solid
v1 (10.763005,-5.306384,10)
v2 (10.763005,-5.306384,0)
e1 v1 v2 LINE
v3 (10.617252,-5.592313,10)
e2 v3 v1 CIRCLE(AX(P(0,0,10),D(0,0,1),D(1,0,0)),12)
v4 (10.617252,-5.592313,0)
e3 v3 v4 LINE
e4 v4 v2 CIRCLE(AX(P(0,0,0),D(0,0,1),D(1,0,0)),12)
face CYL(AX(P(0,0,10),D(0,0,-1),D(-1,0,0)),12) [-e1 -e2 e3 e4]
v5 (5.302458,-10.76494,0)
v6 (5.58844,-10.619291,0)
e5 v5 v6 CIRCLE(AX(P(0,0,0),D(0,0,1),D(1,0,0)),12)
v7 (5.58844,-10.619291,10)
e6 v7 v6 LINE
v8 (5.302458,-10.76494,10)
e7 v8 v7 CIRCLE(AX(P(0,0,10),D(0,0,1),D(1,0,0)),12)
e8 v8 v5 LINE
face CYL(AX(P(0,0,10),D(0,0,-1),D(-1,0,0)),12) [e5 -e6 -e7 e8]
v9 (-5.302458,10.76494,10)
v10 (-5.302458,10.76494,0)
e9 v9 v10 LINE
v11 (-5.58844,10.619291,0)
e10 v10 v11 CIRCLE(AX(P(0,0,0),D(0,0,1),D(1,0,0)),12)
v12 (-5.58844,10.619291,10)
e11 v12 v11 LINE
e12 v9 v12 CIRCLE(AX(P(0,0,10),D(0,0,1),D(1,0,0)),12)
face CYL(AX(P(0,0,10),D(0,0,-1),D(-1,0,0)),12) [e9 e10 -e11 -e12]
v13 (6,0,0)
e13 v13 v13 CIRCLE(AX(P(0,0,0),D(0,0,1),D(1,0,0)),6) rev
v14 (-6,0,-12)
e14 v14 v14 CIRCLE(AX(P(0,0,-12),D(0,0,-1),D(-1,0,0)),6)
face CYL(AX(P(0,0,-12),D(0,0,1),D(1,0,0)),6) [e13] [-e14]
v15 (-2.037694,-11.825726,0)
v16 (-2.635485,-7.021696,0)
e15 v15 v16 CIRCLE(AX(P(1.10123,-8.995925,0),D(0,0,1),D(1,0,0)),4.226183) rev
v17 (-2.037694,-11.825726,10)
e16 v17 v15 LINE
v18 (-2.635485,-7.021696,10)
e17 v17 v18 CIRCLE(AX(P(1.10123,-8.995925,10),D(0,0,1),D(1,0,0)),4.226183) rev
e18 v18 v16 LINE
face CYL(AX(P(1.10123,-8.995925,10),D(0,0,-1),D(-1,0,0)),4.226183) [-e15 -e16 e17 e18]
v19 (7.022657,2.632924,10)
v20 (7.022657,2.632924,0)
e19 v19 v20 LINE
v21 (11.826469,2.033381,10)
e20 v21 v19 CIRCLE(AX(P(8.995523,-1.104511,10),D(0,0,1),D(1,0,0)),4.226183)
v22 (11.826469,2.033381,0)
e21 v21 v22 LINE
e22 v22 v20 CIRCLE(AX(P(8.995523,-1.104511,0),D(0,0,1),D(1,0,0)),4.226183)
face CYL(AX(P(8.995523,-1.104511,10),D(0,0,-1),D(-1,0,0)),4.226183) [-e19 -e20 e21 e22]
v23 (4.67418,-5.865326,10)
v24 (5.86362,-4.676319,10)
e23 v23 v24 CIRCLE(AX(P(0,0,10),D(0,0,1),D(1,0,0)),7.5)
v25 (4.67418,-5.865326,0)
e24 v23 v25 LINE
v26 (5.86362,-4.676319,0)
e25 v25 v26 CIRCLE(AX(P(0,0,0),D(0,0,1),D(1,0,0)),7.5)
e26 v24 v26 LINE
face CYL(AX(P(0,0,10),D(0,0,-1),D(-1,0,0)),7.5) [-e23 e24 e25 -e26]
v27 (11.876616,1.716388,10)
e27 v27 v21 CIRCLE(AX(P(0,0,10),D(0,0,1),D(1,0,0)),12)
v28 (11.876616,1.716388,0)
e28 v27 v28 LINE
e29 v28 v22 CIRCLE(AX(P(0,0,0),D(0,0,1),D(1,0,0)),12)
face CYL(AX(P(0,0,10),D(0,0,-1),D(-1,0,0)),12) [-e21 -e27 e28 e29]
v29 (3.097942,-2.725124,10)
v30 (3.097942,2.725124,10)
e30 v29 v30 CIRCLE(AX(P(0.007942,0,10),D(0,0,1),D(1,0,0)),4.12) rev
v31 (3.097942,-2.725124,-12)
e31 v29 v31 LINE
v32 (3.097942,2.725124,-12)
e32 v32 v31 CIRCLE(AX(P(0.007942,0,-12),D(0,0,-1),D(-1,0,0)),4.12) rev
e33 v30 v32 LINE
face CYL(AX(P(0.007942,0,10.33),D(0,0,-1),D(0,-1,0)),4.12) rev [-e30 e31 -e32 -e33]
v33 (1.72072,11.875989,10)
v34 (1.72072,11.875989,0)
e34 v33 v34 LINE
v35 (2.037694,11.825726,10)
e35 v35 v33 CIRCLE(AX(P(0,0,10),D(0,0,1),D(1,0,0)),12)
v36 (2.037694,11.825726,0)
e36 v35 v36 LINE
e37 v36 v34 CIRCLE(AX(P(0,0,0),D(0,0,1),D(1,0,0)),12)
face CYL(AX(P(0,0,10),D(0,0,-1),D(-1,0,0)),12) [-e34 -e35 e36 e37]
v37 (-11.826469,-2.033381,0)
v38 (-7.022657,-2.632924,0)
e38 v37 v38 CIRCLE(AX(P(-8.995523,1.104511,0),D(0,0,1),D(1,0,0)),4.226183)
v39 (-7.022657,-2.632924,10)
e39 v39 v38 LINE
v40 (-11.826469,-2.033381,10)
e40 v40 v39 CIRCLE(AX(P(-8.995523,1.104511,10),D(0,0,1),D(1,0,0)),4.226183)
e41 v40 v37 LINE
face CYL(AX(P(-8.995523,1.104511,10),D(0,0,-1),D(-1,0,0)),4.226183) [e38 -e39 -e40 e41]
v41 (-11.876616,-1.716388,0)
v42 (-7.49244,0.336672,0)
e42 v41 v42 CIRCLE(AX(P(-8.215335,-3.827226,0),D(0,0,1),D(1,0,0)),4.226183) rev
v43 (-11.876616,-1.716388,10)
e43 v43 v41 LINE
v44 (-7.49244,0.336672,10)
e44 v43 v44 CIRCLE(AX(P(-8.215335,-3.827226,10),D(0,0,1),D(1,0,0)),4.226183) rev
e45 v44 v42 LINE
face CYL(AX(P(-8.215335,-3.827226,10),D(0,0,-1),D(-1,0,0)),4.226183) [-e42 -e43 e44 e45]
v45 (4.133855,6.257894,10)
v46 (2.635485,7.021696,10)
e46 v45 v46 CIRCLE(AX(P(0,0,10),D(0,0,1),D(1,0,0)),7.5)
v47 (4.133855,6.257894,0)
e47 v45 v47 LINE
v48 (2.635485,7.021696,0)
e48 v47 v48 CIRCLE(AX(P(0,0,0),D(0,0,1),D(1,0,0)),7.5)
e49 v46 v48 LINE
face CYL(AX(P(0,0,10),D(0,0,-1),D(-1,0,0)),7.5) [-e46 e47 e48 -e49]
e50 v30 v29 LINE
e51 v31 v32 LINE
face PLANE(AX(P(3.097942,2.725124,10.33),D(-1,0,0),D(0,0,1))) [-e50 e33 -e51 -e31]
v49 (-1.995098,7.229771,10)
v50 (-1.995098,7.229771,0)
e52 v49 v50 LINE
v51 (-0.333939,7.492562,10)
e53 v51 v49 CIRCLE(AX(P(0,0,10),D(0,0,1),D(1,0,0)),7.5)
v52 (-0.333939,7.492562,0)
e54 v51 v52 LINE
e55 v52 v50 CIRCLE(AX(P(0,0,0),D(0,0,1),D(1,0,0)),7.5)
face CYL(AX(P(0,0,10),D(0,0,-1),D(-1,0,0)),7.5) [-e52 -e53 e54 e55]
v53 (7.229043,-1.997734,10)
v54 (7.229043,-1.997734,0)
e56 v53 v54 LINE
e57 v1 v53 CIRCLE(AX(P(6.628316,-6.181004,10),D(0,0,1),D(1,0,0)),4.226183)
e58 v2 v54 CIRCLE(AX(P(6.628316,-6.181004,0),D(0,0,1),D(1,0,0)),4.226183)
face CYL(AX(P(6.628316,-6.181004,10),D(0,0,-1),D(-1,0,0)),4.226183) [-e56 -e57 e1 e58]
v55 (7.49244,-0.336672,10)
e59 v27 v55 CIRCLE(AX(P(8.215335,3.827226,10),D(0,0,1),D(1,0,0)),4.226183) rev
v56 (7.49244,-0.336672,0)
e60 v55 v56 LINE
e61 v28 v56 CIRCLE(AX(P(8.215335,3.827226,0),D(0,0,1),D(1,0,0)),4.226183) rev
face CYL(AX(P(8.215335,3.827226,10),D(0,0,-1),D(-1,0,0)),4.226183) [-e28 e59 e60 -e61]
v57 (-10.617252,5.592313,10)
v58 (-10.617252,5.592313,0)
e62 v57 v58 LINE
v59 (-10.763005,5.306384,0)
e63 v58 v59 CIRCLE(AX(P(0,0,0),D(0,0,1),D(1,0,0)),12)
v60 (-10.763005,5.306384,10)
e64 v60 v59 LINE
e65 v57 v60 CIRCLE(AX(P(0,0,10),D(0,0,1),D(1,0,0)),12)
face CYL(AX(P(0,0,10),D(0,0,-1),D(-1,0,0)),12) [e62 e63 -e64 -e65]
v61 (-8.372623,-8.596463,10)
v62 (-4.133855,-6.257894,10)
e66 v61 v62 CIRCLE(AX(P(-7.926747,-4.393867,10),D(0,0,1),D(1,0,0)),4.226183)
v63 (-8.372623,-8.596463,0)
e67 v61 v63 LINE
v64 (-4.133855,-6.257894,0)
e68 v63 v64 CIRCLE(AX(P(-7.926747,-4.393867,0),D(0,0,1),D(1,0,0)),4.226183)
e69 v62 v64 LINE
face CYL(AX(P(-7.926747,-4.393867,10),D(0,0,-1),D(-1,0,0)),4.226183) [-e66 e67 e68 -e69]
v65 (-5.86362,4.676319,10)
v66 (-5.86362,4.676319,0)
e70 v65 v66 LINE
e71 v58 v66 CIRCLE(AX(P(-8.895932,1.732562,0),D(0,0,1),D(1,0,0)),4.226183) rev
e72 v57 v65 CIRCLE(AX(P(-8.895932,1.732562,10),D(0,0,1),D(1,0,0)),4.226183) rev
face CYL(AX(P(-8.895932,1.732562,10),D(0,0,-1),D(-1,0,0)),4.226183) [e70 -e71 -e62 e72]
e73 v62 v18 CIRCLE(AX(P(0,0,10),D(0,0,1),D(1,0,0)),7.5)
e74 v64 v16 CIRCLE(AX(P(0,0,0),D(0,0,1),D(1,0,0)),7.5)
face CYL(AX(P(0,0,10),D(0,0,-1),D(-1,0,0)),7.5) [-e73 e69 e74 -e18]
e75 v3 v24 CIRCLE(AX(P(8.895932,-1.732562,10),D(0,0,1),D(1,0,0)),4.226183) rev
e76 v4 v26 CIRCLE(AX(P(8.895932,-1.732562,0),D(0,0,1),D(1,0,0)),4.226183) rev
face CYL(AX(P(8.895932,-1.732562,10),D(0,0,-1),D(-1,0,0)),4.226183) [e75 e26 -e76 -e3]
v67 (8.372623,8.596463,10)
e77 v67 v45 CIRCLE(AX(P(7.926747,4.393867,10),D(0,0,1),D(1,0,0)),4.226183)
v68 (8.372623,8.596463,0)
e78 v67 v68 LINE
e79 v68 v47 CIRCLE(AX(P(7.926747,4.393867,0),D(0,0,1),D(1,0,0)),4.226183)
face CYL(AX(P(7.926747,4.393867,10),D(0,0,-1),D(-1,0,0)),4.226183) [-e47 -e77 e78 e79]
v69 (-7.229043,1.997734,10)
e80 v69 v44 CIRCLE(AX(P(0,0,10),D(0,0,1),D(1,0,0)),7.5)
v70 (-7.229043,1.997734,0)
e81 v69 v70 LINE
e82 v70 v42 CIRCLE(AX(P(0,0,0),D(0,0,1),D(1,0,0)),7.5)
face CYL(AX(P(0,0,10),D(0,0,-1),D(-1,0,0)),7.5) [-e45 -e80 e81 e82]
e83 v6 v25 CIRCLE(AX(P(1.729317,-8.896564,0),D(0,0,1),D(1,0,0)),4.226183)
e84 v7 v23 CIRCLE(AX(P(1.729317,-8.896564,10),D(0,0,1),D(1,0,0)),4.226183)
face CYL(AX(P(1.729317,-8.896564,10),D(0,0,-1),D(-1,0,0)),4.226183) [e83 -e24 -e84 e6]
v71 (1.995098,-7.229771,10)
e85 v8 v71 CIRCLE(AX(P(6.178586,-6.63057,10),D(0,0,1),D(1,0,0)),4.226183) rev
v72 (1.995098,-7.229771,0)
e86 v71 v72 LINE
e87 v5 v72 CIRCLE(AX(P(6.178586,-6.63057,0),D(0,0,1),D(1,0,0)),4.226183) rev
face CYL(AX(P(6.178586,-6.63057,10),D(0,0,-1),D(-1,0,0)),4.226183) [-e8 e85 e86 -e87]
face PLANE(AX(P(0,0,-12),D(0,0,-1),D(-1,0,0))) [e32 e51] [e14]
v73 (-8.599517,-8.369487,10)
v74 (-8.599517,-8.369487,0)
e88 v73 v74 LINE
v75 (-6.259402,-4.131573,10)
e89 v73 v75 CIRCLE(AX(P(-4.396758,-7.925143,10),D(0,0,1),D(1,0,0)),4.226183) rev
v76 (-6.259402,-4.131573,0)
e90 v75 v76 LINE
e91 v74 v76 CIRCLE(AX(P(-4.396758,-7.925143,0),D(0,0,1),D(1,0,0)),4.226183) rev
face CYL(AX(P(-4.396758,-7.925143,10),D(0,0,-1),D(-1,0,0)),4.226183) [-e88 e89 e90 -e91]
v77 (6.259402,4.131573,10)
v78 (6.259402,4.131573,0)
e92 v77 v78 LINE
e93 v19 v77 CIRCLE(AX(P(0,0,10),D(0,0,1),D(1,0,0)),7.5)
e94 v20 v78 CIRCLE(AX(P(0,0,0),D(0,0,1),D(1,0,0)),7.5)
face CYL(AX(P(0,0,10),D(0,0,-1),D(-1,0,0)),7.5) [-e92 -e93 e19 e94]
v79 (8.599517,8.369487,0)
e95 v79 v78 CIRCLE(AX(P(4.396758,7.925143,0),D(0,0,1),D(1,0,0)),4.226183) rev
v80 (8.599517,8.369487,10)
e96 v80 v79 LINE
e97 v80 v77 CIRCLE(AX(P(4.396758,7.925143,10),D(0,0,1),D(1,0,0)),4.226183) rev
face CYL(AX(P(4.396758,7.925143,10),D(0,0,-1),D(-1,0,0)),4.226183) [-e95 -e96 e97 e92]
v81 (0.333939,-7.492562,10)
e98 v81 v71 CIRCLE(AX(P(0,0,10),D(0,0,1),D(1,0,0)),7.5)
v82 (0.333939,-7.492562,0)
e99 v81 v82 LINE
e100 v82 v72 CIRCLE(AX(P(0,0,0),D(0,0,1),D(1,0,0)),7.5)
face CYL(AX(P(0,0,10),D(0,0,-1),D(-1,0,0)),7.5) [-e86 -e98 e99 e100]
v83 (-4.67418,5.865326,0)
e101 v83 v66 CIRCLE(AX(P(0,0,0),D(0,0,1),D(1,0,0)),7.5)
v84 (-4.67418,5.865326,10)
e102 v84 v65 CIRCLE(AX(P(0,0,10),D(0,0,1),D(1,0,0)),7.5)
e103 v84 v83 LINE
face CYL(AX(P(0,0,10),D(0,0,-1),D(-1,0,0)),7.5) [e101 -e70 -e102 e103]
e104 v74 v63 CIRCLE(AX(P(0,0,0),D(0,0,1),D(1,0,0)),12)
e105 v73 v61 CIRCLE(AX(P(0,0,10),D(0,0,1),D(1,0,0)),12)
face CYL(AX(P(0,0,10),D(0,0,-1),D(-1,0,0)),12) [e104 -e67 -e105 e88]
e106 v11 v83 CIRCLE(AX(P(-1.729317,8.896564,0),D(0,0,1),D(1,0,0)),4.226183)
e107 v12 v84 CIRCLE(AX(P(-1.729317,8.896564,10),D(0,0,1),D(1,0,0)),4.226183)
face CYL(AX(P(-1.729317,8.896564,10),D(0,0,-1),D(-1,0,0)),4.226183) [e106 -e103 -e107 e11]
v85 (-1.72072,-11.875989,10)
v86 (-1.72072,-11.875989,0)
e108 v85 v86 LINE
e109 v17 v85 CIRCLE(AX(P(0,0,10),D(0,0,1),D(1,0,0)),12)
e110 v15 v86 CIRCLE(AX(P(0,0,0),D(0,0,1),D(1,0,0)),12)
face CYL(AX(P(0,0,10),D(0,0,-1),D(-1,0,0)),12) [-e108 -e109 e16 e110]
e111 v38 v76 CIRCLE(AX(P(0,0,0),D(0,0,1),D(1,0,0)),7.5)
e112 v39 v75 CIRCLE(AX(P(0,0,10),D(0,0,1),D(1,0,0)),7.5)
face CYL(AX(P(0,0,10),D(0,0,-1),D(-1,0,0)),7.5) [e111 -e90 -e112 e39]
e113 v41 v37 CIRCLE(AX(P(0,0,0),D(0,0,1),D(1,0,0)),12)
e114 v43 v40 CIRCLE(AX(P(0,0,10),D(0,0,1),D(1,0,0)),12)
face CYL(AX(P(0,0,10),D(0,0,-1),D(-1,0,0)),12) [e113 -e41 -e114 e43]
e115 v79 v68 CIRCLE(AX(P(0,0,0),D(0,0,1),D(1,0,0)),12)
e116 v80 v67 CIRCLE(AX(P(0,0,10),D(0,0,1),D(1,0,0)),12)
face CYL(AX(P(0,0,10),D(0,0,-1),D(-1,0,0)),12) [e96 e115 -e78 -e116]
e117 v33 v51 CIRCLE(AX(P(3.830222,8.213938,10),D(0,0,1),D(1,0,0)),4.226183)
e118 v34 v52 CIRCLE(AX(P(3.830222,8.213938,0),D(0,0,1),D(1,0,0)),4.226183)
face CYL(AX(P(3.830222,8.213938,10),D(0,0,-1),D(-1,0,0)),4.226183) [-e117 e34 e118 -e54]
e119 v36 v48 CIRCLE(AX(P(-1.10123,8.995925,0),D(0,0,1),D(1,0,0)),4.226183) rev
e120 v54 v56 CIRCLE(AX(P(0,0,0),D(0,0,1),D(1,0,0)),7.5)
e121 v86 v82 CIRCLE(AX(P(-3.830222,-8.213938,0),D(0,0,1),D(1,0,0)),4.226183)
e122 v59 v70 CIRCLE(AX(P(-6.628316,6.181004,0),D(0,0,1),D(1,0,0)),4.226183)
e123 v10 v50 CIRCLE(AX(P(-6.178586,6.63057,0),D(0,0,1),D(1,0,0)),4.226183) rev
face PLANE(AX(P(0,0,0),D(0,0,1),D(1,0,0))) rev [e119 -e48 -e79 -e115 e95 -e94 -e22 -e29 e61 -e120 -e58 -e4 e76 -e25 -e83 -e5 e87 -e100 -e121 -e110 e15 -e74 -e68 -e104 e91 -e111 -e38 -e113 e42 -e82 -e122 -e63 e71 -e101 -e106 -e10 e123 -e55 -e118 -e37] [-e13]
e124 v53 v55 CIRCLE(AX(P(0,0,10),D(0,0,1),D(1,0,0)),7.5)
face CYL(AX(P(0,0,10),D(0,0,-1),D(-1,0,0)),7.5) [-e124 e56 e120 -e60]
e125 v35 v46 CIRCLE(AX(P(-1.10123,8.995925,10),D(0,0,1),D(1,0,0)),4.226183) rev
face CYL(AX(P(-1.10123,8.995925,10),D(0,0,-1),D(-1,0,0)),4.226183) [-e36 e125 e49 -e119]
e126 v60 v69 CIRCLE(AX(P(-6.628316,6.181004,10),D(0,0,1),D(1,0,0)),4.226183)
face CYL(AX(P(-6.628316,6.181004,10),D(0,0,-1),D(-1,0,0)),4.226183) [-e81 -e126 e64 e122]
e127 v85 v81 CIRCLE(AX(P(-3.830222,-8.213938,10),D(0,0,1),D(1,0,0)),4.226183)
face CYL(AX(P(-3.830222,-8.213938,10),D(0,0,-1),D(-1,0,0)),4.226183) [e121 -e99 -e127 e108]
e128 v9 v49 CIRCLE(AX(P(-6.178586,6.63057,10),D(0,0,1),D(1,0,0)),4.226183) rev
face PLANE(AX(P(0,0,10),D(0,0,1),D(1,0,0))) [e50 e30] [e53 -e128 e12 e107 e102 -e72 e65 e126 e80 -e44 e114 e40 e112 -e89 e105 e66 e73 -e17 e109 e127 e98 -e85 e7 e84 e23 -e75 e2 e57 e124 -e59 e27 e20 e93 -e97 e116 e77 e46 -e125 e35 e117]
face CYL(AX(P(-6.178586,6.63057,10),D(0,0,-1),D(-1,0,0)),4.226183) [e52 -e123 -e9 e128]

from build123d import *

# Parameters (mm, degrees)
CROQUIS1_R              = 4
SALIENTE_EXTRUIR1_DEPTH = 10
SALIENTE_EXTRUIR2_START = -10
SALIENTE_EXTRUIR2_DEPTH = 10
SALIENTE_EXTRUIR3_START = 12
CROQUIS3_R              = 6
SALIENTE_EXTRUIR3_DEPTH = 12
CAVIDAD2_START          = -12
CAVIDAD2_DEPTH          = 22


# Read off the part's stored shape, not the designer's step: Cavidad2
with BuildPart() as part:
    # Croquis1 → Saliente-Extruir1 (new body)
    with BuildSketch(Plane.XY):
        with BuildLine():
            ThreePointArc((2.63548484, 7.021696352), (3.092608138, 9.517786714), (2.0376941, 11.82572631))
            ThreePointArc((2.0376941, 11.82572631), (1.879375062, 11.85191754), (1.720719944, 11.875989343))
            ThreePointArc((1.720719944, 11.875989343), (0.003562929, 10.007620913), (-0.333938693, 7.492561975))
            ThreePointArc((-0.333938693, 7.492561975), (-1.171907523, 7.4078764), (-1.995097537, 7.2297708))
            ThreePointArc((-1.995097537, 7.2297708), (-3.092442124, 9.517840655), (-5.302458366, 10.764940096))
            ThreePointArc((-5.302458366, 10.764940096), (-5.445935977, 10.693071651), (-5.588439715, 10.61929101))
            ThreePointArc((-5.588439715, 10.61929101), (-5.879449513, 8.098429629), (-4.674179509, 5.86532573))
            ThreePointArc((-4.674179509, 5.86532573), (-5.3023336, 5.304267941), (-5.863620467, 4.676318533))
            ThreePointArc((-5.863620467, 4.676318533), (-8.096284603, 5.882402966), (-10.617251961, 5.592312652))
            ThreePointArc((-10.617251961, 5.592312652), (-10.691084574, 5.449835835), (-10.763005347, 5.306384448))
            ThreePointArc((-10.763005347, 5.306384448), (-9.516712076, 3.095913482), (-7.229042621, 1.997734411))
            ThreePointArc((-7.229042621, 1.997734411), (-7.407448462, 1.174609414), (-7.492439675, 0.336671529))
            ThreePointArc((-7.492439675, 0.336671529), (-10.007621547, 8.7279e-05), (-11.876616173, -1.716388149))
            ThreePointArc((-11.876616173, -1.716388149), (-11.85260224, -1.875052036), (-11.826468757, -2.033380616))
            ThreePointArc((-11.826468757, -2.033380616), (-9.518914087, -3.089136389), (-7.022657159, -2.632923552))
            ThreePointArc((-7.022657159, -2.632923552), (-6.683169782, -3.403709986), (-6.259401586, -4.131572556))
            ThreePointArc((-6.259401586, -4.131572556), (-8.096387206, -5.882261746), (-8.599516679, -8.369487015))
            ThreePointArc((-8.599516679, -8.369487015), (-8.486828706, -8.483733761), (-8.37262307, -8.596463397))
            ThreePointArc((-8.37262307, -8.596463397), (-5.885214453, -8.094241155), (-4.133855353, -6.257894208))
            ThreePointArc((-4.133855353, -6.257894208), (-3.406147397, -6.681927859), (-2.63548484, -7.021696352))
            ThreePointArc((-2.63548484, -7.021696352), (-3.092608138, -9.517786714), (-2.0376941, -11.82572631))
            ThreePointArc((-2.0376941, -11.82572631), (-1.879375062, -11.85191754), (-1.720719944, -11.875989343))
            ThreePointArc((-1.720719944, -11.875989343), (-0.003562929, -10.007620913), (0.333938693, -7.492561975))
            ThreePointArc((0.333938693, -7.492561975), (1.171907523, -7.4078764), (1.995097537, -7.2297708))
            ThreePointArc((1.995097537, -7.2297708), (3.092442124, -9.517840655), (5.302458366, -10.764940096))
            ThreePointArc((5.302458366, -10.764940096), (5.445935977, -10.693071651), (5.588439715, -10.61929101))
            ThreePointArc((5.588439715, -10.61929101), (5.879449513, -8.098429629), (4.674179509, -5.86532573))
            ThreePointArc((4.674179509, -5.86532573), (5.3023336, -5.304267941), (5.863620467, -4.676318533))
            ThreePointArc((5.863620467, -4.676318533), (8.096284603, -5.882402966), (10.617251961, -5.592312652))
            ThreePointArc((10.617251961, -5.592312652), (10.691084574, -5.449835835), (10.763005347, -5.306384448))
            ThreePointArc((10.763005347, -5.306384448), (9.516712076, -3.095913482), (7.229042621, -1.997734411))
            ThreePointArc((7.229042621, -1.997734411), (7.407448462, -1.174609414), (7.492439675, -0.336671529))
            ThreePointArc((7.492439675, -0.336671529), (10.007621547, -8.7279e-05), (11.876616173, 1.716388149))
            ThreePointArc((11.876616173, 1.716388149), (11.85260224, 1.875052036), (11.826468757, 2.033380616))
            ThreePointArc((11.826468757, 2.033380616), (9.518914087, 3.089136389), (7.022657159, 2.632923552))
            ThreePointArc((7.022657159, 2.632923552), (6.683169782, 3.403709986), (6.259401586, 4.131572556))
            ThreePointArc((6.259401586, 4.131572556), (8.096387206, 5.882261746), (8.599516679, 8.369487015))
            ThreePointArc((8.599516679, 8.369487015), (8.486828706, 8.483733761), (8.37262307, 8.596463397))
            ThreePointArc((8.37262307, 8.596463397), (5.885214453, 8.094241155), (4.133855353, 6.257894208))
            ThreePointArc((4.133855353, 6.257894208), (3.406147397, 6.681927859), (2.63548484, 7.021696352))
        make_face()
        Circle(CROQUIS1_R, mode=Mode.SUBTRACT)
    extrude(amount=SALIENTE_EXTRUIR1_DEPTH)

    # Croquis2 → Saliente-Extruir2 (add)
    with BuildSketch(Plane.XY.offset(10).offset(SALIENTE_EXTRUIR2_START)):
        with BuildLine():
            Line((3, 2.645751311), (3, -2.645751311))
            ThreePointArc((3, -2.645751311), (4, 0), (3, 2.645751311))
        make_face()
    extrude(amount=SALIENTE_EXTRUIR2_DEPTH)

    # Croquis3 → Saliente-Extruir3 (add)
    with BuildSketch(Plane(origin=(0, 0, 0), x_dir=(-1, 0, 0), z_dir=(0, 0, -1)).offset(SALIENTE_EXTRUIR3_START)):
        with Locations(Location((0, 0, 0), (0, 0, 180))):
            Circle(CROQUIS3_R)
        with BuildLine():
            Line((-3, -2.645751311), (-3, 2.645751311))
            ThreePointArc((-3, 2.645751311), (4, 0), (-3, -2.645751311))
        make_face(mode=Mode.SUBTRACT)
    extrude(amount=-SALIENTE_EXTRUIR3_DEPTH)

    # Cavidad2 outline → Cavidad2 (cut)
    with BuildSketch(Plane.XY.offset(CAVIDAD2_START)):
        with BuildLine():
            ThreePointArc((3.097941964, 2.72512385), (-4.112058036, 0), (3.097941964, -2.72512385))
            Line((3.097941964, -2.72512385), (3.097941964, 2.72512385))
        make_face()
        with BuildLine():
            Line((3, 2.645751311), (3, -2.645751311))
            ThreePointArc((3, -2.645751311), (-4, 0), (3, 2.645751311))
        make_face(mode=Mode.SUBTRACT)
    extrude(amount=CAVIDAD2_DEPTH, mode=Mode.SUBTRACT)


solid = part.part
